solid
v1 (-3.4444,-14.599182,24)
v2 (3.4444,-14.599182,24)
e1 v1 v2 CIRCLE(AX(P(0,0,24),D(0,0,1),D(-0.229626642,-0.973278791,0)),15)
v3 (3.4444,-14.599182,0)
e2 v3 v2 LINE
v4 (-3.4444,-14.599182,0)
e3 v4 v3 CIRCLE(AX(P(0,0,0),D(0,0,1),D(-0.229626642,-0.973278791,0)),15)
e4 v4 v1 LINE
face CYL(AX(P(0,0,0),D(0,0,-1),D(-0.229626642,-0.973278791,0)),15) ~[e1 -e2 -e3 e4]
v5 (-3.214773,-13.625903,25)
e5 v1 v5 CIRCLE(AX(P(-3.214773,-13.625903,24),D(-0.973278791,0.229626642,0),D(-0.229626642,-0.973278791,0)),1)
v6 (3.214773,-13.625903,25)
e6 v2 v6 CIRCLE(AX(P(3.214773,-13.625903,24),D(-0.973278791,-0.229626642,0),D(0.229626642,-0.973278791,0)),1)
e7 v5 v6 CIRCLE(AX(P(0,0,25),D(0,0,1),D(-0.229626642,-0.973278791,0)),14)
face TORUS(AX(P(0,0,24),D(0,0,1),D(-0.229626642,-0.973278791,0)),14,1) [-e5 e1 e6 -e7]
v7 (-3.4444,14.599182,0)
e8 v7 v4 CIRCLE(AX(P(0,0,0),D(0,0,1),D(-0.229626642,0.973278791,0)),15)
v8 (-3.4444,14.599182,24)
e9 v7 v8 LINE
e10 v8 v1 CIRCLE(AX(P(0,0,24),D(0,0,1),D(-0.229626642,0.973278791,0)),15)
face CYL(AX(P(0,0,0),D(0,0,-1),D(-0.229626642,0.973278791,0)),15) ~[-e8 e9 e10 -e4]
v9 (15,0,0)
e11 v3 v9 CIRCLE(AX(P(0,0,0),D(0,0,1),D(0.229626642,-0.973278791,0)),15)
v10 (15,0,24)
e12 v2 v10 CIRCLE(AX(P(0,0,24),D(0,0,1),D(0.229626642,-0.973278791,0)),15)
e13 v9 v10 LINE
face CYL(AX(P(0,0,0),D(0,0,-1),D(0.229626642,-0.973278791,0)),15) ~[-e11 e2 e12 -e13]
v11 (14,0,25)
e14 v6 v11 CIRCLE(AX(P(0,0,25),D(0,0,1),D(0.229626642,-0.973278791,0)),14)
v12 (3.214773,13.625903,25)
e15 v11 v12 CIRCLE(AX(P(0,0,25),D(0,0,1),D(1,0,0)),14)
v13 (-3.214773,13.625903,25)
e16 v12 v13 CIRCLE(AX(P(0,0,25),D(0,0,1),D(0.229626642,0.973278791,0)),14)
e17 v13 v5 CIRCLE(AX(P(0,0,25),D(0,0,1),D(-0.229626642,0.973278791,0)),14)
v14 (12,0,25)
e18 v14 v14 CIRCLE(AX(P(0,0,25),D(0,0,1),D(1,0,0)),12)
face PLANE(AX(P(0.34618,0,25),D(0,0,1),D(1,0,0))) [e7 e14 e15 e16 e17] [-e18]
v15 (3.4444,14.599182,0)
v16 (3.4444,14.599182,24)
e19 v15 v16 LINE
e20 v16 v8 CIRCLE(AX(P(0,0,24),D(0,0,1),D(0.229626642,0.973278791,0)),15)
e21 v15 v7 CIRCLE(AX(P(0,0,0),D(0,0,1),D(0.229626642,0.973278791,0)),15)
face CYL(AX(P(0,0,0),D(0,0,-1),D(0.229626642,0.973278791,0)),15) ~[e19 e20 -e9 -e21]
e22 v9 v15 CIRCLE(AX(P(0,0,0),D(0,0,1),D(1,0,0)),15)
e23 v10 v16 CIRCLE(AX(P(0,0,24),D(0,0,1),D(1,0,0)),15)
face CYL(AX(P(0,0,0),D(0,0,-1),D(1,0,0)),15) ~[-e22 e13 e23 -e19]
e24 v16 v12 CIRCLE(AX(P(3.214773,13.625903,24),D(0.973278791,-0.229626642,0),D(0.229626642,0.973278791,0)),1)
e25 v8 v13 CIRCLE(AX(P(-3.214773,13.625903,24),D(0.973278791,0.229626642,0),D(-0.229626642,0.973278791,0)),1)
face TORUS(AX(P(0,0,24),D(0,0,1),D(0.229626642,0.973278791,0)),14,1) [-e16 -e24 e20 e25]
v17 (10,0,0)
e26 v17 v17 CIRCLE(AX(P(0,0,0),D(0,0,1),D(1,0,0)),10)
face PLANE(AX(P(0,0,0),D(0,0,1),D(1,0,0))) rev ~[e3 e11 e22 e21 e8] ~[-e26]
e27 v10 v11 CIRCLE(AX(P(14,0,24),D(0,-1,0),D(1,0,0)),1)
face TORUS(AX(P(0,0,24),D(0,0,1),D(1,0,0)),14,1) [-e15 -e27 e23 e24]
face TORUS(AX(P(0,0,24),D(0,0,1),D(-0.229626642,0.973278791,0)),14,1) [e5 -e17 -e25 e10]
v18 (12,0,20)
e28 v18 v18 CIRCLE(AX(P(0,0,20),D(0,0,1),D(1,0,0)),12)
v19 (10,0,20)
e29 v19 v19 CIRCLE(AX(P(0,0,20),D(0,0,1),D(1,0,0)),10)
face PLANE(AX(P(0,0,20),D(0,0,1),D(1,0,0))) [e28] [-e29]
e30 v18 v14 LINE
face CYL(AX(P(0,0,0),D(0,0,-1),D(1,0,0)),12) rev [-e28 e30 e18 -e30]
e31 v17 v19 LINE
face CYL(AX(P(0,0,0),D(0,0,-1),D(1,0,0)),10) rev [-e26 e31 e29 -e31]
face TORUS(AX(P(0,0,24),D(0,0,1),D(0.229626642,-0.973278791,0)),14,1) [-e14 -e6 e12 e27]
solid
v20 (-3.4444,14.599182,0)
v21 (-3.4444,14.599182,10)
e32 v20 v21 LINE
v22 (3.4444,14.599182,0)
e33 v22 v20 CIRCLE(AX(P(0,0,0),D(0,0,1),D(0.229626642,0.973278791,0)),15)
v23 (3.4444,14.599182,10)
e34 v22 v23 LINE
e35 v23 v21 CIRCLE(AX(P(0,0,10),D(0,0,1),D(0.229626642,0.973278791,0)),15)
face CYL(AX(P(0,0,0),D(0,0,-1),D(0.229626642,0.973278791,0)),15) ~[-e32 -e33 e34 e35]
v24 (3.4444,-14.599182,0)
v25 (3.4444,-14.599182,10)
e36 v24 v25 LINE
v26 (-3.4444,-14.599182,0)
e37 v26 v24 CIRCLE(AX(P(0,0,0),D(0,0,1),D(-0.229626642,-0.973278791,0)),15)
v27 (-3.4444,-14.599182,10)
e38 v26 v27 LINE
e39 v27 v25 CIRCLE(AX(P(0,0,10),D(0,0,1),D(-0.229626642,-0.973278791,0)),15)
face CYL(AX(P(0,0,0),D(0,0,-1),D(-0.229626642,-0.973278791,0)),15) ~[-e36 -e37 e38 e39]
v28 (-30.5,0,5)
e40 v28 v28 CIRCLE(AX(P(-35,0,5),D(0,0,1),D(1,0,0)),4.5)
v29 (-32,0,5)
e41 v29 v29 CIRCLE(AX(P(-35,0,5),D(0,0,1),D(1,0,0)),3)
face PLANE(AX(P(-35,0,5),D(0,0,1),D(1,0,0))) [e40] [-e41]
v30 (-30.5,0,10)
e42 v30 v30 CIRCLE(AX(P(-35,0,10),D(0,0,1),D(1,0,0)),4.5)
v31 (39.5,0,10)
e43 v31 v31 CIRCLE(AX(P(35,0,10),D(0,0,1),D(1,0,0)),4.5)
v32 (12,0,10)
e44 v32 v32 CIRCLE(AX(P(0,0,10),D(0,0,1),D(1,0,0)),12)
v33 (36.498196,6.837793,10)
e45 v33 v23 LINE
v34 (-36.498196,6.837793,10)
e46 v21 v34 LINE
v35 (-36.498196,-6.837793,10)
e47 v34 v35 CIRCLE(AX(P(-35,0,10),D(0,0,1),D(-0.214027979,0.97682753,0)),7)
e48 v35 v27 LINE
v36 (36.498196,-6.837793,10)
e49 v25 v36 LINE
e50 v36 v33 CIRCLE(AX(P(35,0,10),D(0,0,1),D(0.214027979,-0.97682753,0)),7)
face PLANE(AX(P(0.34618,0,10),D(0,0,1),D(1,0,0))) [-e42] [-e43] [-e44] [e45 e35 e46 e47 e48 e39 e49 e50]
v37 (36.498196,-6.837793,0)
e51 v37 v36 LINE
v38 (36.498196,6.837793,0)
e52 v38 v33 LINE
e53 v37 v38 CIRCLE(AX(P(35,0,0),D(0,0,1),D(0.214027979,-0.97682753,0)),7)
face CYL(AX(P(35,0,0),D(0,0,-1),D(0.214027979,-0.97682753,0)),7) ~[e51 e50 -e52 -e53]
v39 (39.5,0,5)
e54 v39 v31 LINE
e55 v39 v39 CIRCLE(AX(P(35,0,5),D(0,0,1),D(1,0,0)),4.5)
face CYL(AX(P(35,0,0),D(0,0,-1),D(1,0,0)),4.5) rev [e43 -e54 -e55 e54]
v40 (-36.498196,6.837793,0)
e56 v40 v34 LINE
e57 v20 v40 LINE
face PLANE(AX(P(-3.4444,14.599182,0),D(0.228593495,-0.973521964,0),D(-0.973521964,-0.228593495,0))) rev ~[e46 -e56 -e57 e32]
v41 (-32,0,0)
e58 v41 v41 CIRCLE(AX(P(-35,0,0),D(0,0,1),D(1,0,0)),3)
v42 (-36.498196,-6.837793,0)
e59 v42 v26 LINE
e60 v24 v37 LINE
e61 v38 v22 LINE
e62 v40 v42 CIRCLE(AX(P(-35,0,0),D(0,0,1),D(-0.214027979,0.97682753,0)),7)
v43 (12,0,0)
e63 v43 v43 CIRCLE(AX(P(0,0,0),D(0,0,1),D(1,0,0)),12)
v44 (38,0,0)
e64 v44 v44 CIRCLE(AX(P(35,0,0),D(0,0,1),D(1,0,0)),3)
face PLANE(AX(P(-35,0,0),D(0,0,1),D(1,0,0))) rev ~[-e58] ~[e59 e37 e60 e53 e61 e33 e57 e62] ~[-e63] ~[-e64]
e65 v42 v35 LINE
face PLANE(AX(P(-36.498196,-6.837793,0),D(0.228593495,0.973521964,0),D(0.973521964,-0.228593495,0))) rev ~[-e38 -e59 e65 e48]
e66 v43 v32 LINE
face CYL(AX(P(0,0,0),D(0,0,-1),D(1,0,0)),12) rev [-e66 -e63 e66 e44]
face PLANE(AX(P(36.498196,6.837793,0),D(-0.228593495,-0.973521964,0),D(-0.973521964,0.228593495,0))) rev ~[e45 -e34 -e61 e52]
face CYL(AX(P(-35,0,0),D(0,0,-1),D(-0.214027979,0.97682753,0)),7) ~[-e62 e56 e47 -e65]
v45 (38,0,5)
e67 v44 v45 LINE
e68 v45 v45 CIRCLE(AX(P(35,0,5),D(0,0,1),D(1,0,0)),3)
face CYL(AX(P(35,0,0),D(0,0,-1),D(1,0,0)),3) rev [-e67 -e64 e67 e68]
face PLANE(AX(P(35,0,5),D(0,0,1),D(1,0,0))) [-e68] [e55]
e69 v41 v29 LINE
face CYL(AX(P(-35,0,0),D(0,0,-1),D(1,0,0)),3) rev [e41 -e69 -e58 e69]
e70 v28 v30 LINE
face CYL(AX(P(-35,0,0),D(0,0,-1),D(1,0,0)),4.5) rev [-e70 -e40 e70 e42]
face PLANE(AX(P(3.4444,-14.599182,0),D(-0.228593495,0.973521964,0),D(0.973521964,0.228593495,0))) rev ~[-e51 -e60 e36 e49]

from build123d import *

# Parameters (mm, degrees)
F0_R     = 12
F0_R_2   = 4.5
F1_DEPTH = 10
F2_DEPTH = 25
F0_R_3   = 10
F3_DEPTH = 20
F0_R_4   = 3
F4_DEPTH = 5
F5_R     = 1


with BuildPart() as f1:
    # F0 (on Top) → F1 (new body)
    with BuildSketch(Plane.XY):
        with BuildLine():
            ThreePointArc((3.4443996306, -14.599181867), (11.761504888, -9.3095114142), (15, 0))
            ThreePointArc((15, 0), (11.761504888, 9.3095114142), (3.4443996306, 14.599181867))
            ThreePointArc((3.4443996306, 14.599181867), (0, 15), (-3.4443996306, 14.599181867))
            ThreePointArc((-3.4443996306, 14.599181867), (-15, 0), (-3.4443996306, -14.599181867))
            ThreePointArc((-3.4443996306, -14.599181867), (0, -15), (3.4443996306, -14.599181867))
        make_face()
        Circle(F0_R, mode=Mode.SUBTRACT)
        with BuildLine():
            ThreePointArc((3.4443996306, 14.599181867), (11.761504888, 9.3095114142), (15, 0))
            ThreePointArc((15, 0), (11.761504888, -9.3095114142), (3.4443996306, -14.599181867))
            Line((3.4443996306, -14.599181867), (36.4981958522, -6.8377927132))
            ThreePointArc((36.4981958522, -6.8377927132), (42, 0), (36.4981958522, 6.8377927132))
            Line((36.4981958522, 6.8377927132), (3.4443996306, 14.599181867))
        make_face()
        with Locations((35, 0)):
            Circle(F0_R_2, mode=Mode.SUBTRACT)
        with BuildLine():
            ThreePointArc((-3.4443996306, -14.599181867), (-15, 0), (-3.4443996306, 14.599181867))
            Line((-3.4443996306, 14.599181867), (-36.4981958522, 6.8377927132))
            ThreePointArc((-36.4981958522, 6.8377927132), (-42, 0), (-36.4981958522, -6.8377927132))
            Line((-36.4981958522, -6.8377927132), (-3.4443996306, -14.599181867))
        make_face()
        with Locations((-35, 0)):
            Circle(F0_R_2, mode=Mode.SUBTRACT)
    extrude(amount=F1_DEPTH)

    # F0 (on Top) → F4 (join)
    with BuildSketch(Plane.XY):
        with Locations((-35, 0)):
            Circle(F0_R_2)
        with Locations((-35, 0)):
            Circle(F0_R_4, mode=Mode.SUBTRACT)
        with Locations((35, 0)):
            Circle(F0_R_2)
        with Locations((35, 0)):
            Circle(F0_R_4, mode=Mode.SUBTRACT)
    extrude(amount=F4_DEPTH)


with BuildPart() as f2:
    # F0 (on Top) → F2 (new body)
    with BuildSketch(Plane.XY):
        with BuildLine():
            ThreePointArc((3.4443996306, -14.599181867), (11.761504888, -9.3095114142), (15, 0))
            ThreePointArc((15, 0), (11.761504888, 9.3095114142), (3.4443996306, 14.599181867))
            ThreePointArc((3.4443996306, 14.599181867), (0, 15), (-3.4443996306, 14.599181867))
            ThreePointArc((-3.4443996306, 14.599181867), (-15, 0), (-3.4443996306, -14.599181867))
            ThreePointArc((-3.4443996306, -14.599181867), (0, -15), (3.4443996306, -14.599181867))
        make_face()
        Circle(F0_R, mode=Mode.SUBTRACT)
    extrude(amount=F2_DEPTH)

    # F0 (on Top) → F3 (join)
    with BuildSketch(Plane.XY):
        Circle(F0_R)
        Circle(F0_R_3, mode=Mode.SUBTRACT)
    extrude(amount=F3_DEPTH)

    # F5
    f5_edges = [f2.edges().sort_by_distance(p)[0] for p in [
        (-3.4444, -14.599182, 25),
    ]]
    fillet(f5_edges, radius=F5_R)


solid = Compound([f1.part, f2.part])
